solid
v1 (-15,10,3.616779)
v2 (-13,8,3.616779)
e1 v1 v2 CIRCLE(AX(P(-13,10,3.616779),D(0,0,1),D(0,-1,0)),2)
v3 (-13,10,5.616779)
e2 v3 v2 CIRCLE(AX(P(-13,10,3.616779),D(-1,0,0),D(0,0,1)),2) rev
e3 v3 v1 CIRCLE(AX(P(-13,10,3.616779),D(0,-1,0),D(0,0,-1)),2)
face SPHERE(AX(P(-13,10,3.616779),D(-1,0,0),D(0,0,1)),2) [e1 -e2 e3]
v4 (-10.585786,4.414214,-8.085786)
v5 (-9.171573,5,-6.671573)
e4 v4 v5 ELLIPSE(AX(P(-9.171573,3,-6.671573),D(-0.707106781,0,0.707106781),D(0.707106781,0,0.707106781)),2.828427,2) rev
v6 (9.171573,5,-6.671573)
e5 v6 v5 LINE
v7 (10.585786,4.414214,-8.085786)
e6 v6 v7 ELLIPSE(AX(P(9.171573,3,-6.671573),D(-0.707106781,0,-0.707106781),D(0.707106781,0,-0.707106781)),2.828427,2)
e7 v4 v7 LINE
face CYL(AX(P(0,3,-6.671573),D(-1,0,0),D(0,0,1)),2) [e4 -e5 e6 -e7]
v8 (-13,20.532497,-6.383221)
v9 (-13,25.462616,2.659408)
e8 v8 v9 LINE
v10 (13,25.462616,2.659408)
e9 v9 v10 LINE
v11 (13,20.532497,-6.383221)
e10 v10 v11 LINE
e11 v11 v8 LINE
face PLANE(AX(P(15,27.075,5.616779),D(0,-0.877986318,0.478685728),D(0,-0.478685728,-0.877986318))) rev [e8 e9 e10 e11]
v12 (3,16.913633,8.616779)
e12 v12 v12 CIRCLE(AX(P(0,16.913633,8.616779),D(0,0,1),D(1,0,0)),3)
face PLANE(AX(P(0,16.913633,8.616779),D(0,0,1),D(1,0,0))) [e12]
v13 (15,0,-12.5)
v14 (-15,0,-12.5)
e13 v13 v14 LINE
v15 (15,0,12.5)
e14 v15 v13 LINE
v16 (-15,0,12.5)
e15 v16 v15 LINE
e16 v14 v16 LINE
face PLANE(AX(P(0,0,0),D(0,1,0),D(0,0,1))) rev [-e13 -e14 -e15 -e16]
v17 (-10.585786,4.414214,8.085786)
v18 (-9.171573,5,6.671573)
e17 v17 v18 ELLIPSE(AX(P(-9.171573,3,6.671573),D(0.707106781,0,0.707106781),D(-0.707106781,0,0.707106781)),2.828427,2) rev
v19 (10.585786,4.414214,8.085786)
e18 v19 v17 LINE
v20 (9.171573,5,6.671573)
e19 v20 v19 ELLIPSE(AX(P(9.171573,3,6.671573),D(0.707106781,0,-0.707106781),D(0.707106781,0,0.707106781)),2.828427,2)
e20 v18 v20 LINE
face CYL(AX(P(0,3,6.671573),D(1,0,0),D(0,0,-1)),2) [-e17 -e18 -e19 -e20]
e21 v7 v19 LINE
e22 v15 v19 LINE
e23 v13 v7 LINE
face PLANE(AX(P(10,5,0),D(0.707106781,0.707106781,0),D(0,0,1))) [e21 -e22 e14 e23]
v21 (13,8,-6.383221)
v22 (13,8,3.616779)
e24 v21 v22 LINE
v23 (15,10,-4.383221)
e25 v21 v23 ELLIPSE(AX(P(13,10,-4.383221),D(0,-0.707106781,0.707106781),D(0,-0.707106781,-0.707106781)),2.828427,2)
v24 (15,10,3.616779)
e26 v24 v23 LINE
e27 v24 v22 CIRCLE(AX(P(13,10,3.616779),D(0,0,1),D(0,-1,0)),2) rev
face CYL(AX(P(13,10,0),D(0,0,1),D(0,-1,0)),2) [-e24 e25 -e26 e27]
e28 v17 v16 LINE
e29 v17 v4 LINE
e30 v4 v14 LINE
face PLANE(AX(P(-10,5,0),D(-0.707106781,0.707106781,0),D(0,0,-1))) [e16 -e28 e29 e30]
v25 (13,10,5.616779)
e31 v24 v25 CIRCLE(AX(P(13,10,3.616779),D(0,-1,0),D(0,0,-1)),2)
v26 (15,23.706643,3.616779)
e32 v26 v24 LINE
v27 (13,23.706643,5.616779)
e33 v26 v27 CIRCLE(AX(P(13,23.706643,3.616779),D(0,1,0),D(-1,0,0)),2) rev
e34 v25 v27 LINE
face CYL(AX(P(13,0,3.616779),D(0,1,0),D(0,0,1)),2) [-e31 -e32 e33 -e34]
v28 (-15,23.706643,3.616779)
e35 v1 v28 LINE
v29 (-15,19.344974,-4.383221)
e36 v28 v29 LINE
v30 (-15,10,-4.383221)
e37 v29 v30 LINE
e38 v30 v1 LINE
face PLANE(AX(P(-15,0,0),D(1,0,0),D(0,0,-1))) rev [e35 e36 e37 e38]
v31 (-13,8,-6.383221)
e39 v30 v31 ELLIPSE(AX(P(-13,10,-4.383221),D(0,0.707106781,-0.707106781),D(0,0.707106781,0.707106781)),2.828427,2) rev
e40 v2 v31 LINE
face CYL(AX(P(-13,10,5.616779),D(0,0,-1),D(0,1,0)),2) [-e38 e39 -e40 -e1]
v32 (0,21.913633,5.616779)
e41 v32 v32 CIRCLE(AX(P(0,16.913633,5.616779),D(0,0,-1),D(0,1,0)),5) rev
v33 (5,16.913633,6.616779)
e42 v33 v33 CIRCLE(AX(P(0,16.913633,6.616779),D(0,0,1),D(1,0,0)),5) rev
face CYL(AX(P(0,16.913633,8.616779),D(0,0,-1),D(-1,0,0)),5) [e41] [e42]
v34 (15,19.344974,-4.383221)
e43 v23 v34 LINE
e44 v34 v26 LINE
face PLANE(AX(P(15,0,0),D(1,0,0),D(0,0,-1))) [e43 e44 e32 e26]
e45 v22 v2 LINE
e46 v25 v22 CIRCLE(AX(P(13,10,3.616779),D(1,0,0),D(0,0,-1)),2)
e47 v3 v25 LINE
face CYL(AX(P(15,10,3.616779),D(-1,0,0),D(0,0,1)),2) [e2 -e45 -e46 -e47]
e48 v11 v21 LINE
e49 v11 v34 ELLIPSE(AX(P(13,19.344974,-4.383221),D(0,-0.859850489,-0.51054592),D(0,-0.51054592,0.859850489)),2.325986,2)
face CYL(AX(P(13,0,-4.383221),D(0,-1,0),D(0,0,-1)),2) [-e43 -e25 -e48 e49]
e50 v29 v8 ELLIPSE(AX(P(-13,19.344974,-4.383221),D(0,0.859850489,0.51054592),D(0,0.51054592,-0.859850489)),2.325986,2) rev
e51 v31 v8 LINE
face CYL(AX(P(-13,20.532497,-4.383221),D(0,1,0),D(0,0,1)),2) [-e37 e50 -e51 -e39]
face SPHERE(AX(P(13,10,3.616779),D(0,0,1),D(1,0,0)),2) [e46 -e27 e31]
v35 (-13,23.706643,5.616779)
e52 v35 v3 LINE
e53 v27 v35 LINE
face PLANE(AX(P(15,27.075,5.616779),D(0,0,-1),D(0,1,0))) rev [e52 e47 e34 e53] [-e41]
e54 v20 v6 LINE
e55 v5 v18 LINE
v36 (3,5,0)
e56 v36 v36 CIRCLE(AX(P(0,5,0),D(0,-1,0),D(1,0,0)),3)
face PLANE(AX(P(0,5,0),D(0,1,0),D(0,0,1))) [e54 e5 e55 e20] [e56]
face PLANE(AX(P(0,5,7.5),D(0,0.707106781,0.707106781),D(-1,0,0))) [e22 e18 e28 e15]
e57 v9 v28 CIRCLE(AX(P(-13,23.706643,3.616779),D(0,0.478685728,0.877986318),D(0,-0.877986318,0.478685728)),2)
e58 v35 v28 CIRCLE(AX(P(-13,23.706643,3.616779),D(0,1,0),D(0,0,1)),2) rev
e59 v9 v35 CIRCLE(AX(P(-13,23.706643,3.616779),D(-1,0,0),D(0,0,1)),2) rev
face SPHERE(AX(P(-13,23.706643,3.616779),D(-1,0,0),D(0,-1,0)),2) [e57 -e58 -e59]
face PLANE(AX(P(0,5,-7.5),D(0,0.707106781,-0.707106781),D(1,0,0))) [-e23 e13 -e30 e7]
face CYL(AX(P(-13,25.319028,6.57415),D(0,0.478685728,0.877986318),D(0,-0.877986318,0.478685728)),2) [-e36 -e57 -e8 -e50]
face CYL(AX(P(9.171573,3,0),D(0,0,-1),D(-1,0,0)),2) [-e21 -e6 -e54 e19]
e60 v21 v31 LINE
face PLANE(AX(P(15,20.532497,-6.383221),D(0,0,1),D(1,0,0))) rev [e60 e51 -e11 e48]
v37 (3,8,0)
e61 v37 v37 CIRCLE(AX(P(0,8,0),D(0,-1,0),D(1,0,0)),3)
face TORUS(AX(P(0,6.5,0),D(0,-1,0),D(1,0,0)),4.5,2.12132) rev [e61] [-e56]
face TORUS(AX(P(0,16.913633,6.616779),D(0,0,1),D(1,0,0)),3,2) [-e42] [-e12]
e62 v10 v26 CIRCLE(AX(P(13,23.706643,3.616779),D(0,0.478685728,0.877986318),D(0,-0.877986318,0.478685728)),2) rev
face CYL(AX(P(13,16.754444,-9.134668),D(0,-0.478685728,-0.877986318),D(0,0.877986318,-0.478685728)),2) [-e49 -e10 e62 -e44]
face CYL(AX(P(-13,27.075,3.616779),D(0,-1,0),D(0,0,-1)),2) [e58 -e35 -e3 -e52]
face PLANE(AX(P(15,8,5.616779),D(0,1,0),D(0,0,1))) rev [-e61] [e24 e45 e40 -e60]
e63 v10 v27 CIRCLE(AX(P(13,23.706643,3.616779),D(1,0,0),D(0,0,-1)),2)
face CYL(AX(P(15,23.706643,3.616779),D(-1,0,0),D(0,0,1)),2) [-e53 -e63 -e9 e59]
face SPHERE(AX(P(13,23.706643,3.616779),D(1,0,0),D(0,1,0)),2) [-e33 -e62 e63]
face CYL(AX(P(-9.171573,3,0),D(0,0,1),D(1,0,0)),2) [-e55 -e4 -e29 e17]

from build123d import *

# Parameters (mm, degrees)
SKETCH1_W           = 30
SKETCH1_H           = 25
BOSS_EXTRUDE1_DEPTH = 5
CHAMFER1_SIZE       = 5
BOSS_EXTRUDE4_DEPTH = 15
FILLET3_R           = 2
FILLET4_R           = 2
SKETCH12_R          = 5
BOSS_EXTRUDE5_DEPTH = 3
FILLET5_R           = 2


with BuildPart() as part:
    # Sketch1 → Boss-Extrude1 (new body)
    with BuildSketch(Plane(origin=(0, 0, 0), x_dir=(1, 0, 0), z_dir=(0, 1, 0))):
        Rectangle(SKETCH1_W, SKETCH1_H)
    extrude(amount=BOSS_EXTRUDE1_DEPTH)

    # Chamfer1
    chamfer1_edges = [part.edges().sort_by_distance(p)[0] for p in [
        (0, 5, 12.5),
        (-15, 5, 0),
        (0, 5, -12.5),
        (15, 5, 0),
    ]]
    chamfer(chamfer1_edges, length=CHAMFER1_SIZE - 0.0001)  # a hair under: the kernel refuses the full size

    # Sketch9 → Revolve1 (revolve)
    with BuildSketch(Plane.XY):
        with BuildLine():
            Line((0, 5), (0, 8))
            Line((0, 8), (3, 8))
            ThreePointArc((3, 8), (2.378679656, 6.5), (3, 5))
            Line((3, 5), (0, 5))
        make_face()
    revolve(axis=Axis((0, 5, 0), (0, 1, 0)))

    # Sketch11 → Boss-Extrude4 (add, symmetric)
    with BuildSketch(Plane(origin=(0, 0, 0), x_dir=(0, 0, -1), z_dir=(1, 0, 0))):
        Polygon((-5.616779032, 27.075000452), (6.383220968, 20.532496755), (6.383220968, 8), (-5.616779032, 8), align=None)
    extrude(amount=BOSS_EXTRUDE4_DEPTH, both=True)

    # Fillet3
    fillet3_edges = [part.edges().sort_by_distance(p)[0] for p in [
        (-15, 14.266248378, -6.383220968),
        (-15, 23.803748604, -0.383220968),
        (-15, 17.537500226, 5.616779032),
        (0, 27.075000452, 5.616779032),
        (-15, 8, -0.383220968),
        (0, 8, 5.616779032),
        (15, 14.266248378, -6.383220968),
        (15, 23.803748604, -0.383220968),
        (15, 17.537500226, 5.616779032),
        (15, 8, -0.383220968),
    ]]
    fillet(fillet3_edges, radius=FILLET3_R)

    # Fillet4
    fillet4_edges = [part.edges().sort_by_distance(p)[0] for p in [
        (10.0001, 5, 0),
        (0, 5, -7.5001),
        (-10.0001, 5, 0),
        (0, 5, 7.5001),
    ]]
    fillet(fillet4_edges, radius=FILLET4_R)

    # Sketch12 → Boss-Extrude5 (add)
    with BuildSketch(Plane.XY.offset(5.616779032)):
        with Locations(Location((0, 16.913633245, 0), (0, 0, 90))):
            Circle(SKETCH12_R)
    extrude(amount=BOSS_EXTRUDE5_DEPTH)

    # Fillet5
    fillet5_edges = [part.edges().sort_by_distance(p)[0] for p in [
        (0, 11.913633245, 8.616779032),
    ]]
    fillet(fillet5_edges, radius=FILLET5_R)


solid = part.part
